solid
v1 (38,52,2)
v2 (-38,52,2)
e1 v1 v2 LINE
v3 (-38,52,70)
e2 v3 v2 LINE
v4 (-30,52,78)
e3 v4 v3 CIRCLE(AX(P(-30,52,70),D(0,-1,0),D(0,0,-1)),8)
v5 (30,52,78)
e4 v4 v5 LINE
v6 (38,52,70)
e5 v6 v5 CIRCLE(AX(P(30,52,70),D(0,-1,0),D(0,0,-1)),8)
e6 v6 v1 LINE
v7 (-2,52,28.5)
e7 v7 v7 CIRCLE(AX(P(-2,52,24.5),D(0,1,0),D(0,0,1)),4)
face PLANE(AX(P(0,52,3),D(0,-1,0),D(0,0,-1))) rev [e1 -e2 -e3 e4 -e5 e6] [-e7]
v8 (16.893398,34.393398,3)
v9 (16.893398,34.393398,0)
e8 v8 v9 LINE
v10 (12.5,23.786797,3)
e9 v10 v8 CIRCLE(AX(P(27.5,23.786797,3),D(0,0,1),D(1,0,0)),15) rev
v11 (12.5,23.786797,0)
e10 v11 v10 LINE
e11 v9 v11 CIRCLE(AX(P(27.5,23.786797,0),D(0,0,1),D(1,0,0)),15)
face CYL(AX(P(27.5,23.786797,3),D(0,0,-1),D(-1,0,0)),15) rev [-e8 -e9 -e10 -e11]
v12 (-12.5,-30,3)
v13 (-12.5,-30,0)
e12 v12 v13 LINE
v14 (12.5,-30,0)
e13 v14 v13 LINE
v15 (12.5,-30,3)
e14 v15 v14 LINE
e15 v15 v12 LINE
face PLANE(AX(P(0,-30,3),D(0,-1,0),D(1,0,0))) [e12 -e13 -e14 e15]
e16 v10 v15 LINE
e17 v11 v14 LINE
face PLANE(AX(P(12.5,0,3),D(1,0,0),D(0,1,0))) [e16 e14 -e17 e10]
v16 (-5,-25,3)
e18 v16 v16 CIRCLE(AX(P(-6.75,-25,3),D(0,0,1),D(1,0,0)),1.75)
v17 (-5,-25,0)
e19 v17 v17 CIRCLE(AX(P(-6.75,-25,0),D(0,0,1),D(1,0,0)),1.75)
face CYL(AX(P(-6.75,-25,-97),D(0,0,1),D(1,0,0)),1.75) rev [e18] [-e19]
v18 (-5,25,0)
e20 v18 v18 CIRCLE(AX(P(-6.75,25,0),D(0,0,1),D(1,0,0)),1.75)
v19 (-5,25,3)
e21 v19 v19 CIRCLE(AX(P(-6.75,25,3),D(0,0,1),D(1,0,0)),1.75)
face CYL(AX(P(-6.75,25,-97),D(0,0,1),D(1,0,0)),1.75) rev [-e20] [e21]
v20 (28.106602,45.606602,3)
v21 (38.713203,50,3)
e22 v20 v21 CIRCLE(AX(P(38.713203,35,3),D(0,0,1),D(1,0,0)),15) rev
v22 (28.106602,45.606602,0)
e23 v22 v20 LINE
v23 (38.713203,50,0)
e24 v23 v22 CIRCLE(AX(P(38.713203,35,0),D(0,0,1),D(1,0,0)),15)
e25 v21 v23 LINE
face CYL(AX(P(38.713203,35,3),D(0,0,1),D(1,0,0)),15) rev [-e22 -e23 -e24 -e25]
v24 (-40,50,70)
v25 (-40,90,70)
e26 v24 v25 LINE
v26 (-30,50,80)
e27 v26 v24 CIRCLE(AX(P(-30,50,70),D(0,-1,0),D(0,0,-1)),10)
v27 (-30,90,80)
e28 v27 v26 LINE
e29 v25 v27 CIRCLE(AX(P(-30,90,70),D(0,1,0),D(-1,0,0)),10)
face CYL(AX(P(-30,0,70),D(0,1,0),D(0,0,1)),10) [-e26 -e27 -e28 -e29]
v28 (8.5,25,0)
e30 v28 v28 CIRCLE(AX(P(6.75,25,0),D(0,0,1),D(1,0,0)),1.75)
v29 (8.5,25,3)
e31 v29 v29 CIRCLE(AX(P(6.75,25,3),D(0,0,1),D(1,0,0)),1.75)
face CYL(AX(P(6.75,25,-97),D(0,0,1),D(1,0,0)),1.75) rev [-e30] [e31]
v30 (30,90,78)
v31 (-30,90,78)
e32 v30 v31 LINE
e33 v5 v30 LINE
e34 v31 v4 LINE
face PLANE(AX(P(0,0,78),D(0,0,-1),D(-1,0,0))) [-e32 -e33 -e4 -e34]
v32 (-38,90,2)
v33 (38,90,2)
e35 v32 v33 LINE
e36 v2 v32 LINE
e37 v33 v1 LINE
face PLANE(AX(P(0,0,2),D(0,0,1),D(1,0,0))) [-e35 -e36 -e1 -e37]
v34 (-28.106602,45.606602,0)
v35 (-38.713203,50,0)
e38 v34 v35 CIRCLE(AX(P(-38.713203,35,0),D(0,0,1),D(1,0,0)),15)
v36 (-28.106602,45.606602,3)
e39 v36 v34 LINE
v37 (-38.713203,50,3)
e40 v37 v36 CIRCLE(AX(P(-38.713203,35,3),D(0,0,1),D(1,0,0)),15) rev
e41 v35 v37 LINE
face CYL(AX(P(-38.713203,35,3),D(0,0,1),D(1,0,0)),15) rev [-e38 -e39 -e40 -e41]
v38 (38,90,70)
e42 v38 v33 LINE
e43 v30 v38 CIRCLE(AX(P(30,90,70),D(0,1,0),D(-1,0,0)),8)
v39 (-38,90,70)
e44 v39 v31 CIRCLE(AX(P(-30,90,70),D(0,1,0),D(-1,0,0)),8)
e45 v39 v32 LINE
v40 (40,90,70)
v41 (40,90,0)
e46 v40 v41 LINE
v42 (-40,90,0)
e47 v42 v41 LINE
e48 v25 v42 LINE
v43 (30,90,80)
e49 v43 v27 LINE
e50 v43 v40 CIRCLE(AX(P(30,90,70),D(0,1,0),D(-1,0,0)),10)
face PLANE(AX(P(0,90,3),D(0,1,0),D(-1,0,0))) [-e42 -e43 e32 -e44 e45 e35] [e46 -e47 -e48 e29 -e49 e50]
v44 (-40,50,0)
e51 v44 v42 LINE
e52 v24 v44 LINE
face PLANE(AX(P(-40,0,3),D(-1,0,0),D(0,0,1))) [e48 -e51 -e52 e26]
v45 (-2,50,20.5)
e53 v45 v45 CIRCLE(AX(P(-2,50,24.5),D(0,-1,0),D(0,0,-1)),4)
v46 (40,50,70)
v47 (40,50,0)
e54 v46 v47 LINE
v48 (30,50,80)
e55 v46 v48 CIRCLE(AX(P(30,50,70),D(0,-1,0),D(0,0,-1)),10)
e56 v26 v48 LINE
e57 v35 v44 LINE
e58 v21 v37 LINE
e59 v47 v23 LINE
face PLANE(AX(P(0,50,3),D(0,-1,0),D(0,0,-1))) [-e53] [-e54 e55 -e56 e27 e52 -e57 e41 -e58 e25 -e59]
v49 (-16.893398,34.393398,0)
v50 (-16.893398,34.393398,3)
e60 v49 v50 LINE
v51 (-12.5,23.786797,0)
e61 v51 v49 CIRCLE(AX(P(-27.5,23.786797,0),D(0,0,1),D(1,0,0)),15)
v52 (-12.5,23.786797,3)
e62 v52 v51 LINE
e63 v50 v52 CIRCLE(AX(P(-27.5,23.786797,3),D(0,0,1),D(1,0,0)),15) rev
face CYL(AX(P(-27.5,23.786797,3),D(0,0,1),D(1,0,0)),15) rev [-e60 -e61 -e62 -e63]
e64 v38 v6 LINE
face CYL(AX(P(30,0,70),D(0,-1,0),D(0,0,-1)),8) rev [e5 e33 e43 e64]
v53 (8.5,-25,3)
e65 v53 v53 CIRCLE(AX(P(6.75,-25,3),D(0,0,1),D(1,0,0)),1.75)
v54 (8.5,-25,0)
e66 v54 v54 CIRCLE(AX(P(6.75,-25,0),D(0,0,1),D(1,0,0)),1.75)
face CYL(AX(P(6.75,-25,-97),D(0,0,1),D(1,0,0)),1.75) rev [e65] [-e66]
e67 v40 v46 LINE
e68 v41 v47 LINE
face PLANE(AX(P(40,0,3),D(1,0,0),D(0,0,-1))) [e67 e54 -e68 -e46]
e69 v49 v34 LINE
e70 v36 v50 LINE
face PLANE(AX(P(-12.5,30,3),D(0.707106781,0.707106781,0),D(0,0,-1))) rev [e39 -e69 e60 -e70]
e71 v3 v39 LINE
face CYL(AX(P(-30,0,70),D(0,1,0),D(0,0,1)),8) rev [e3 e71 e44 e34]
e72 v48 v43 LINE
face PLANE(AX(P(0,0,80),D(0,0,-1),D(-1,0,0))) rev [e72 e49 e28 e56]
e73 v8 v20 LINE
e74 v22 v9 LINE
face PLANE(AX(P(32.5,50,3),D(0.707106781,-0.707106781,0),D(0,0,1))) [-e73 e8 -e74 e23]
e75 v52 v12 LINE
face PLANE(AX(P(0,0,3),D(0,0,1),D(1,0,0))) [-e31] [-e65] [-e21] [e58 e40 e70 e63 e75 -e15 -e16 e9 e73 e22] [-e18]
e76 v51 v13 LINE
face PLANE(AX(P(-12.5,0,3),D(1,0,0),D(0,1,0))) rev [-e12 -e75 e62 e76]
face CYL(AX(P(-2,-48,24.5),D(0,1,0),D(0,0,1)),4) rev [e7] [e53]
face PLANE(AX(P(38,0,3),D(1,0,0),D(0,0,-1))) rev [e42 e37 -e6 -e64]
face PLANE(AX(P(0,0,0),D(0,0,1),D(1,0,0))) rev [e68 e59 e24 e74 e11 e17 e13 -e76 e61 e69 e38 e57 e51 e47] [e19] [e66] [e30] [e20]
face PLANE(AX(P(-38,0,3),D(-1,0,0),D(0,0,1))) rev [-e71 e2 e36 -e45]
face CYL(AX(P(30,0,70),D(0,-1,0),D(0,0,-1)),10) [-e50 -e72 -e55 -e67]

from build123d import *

# Parameters (mm, degrees)
SKETCH1_W           = 25
SKETCH1_H           = 60
BOSS_EXTRUDE1_DEPTH = 3
BOSS_EXTRUDE3_START = -3
SKETCH2_W           = 80
SKETCH2_H           = 40
BOSS_EXTRUDE3_DEPTH = 80
FILLET1_R           = 10
SHELL1_START        = 52
SHELL1_DEPTH        = 38
SKETCH3_R           = 4
CUT_EXTRUDE1_DEPTH  = 100
SKETCH4_R           = 1.75
CUT_EXTRUDE2_DEPTH  = 100
CHAMFER1_SIZE       = 20
FILLET2_R           = 15


with BuildPart() as part:
    # Sketch1 → Boss-Extrude1 (new body)
    with BuildSketch(Plane.XY):
        Rectangle(SKETCH1_W, SKETCH1_H)
        Polygon((12.5, 50), (12.5, 30), (-12.5, 30), (-12.5, 50), (-40, 50), (-40, 90), (40, 90), (40, 50), align=None)
    extrude(amount=BOSS_EXTRUDE1_DEPTH)

    # Sketch2 → Boss-Extrude3 (add)
    with BuildSketch(Plane.XY.offset(3).offset(BOSS_EXTRUDE3_START)):
        with Locations((0, 70)):
            Rectangle(SKETCH2_W, SKETCH2_H)
    extrude(amount=BOSS_EXTRUDE3_DEPTH)

    # Fillet1
    fillet1_edges = [part.edges().sort_by_distance(p)[0] for p in [
        (-40, 70, 80),
        (40, 70, 80),
    ]]
    fillet(fillet1_edges, radius=FILLET1_R)

    # Shell1: read off the stored shape, not the designer's step
    # Shell1 outline → Shell1 (cut)
    with BuildSketch(Plane(origin=(0, 0, 0), x_dir=(1, 0, 0), z_dir=(0, 1, 0)).offset(SHELL1_START)):
        with BuildLine():
            ThreePointArc((30, -78), (35.656854249, -75.656854249), (38, -70))
            Line((38, -70), (38, -2))
            Line((38, -2), (-38, -2))
            Line((-38, -2), (-38, -70))
            ThreePointArc((-38, -70), (-35.656854249, -75.656854249), (-30, -78))
            Line((-30, -78), (30, -78))
        make_face()
    extrude(amount=SHELL1_DEPTH, mode=Mode.SUBTRACT)

    # Sketch3 → Cut-Extrude1 (cut)
    with BuildSketch(Plane(origin=(0, 52, 0), x_dir=(1, 0, 0), z_dir=(0, 1, 0))):
        with Locations(Location((-2, -24.5, 0), (0, 0, 270))):
            Circle(SKETCH3_R)
    extrude(amount=-CUT_EXTRUDE1_DEPTH, mode=Mode.SUBTRACT)

    # Sketch4 → Cut-Extrude2 (cut)
    with BuildSketch(Plane.XY.offset(3)):
        with Locations((-6.75, 25)):
            Circle(SKETCH4_R)
        with Locations((6.75, 25)):
            Circle(SKETCH4_R)
        with Locations((6.75, -25)):
            Circle(SKETCH4_R)
        with Locations((-6.75, -25)):
            Circle(SKETCH4_R)
    extrude(amount=-CUT_EXTRUDE2_DEPTH, mode=Mode.SUBTRACT)

    # Chamfer1
    chamfer1_edges = [part.edges().sort_by_distance(p)[0] for p in [
        (-12.5, 50, 1.5),
        (12.5, 50, 1.5),
    ]]
    chamfer(chamfer1_edges, length=CHAMFER1_SIZE)

    # Fillet2
    fillet2_edges = [part.edges().sort_by_distance(p)[0] for p in [
        (-32.5, 50, 1.5),
        (32.5, 50, 1.5),
        (12.5, 30, 1.5),
        (-12.5, 30, 1.5),
    ]]
    fillet(fillet2_edges, radius=FILLET2_R)


solid = part.part
